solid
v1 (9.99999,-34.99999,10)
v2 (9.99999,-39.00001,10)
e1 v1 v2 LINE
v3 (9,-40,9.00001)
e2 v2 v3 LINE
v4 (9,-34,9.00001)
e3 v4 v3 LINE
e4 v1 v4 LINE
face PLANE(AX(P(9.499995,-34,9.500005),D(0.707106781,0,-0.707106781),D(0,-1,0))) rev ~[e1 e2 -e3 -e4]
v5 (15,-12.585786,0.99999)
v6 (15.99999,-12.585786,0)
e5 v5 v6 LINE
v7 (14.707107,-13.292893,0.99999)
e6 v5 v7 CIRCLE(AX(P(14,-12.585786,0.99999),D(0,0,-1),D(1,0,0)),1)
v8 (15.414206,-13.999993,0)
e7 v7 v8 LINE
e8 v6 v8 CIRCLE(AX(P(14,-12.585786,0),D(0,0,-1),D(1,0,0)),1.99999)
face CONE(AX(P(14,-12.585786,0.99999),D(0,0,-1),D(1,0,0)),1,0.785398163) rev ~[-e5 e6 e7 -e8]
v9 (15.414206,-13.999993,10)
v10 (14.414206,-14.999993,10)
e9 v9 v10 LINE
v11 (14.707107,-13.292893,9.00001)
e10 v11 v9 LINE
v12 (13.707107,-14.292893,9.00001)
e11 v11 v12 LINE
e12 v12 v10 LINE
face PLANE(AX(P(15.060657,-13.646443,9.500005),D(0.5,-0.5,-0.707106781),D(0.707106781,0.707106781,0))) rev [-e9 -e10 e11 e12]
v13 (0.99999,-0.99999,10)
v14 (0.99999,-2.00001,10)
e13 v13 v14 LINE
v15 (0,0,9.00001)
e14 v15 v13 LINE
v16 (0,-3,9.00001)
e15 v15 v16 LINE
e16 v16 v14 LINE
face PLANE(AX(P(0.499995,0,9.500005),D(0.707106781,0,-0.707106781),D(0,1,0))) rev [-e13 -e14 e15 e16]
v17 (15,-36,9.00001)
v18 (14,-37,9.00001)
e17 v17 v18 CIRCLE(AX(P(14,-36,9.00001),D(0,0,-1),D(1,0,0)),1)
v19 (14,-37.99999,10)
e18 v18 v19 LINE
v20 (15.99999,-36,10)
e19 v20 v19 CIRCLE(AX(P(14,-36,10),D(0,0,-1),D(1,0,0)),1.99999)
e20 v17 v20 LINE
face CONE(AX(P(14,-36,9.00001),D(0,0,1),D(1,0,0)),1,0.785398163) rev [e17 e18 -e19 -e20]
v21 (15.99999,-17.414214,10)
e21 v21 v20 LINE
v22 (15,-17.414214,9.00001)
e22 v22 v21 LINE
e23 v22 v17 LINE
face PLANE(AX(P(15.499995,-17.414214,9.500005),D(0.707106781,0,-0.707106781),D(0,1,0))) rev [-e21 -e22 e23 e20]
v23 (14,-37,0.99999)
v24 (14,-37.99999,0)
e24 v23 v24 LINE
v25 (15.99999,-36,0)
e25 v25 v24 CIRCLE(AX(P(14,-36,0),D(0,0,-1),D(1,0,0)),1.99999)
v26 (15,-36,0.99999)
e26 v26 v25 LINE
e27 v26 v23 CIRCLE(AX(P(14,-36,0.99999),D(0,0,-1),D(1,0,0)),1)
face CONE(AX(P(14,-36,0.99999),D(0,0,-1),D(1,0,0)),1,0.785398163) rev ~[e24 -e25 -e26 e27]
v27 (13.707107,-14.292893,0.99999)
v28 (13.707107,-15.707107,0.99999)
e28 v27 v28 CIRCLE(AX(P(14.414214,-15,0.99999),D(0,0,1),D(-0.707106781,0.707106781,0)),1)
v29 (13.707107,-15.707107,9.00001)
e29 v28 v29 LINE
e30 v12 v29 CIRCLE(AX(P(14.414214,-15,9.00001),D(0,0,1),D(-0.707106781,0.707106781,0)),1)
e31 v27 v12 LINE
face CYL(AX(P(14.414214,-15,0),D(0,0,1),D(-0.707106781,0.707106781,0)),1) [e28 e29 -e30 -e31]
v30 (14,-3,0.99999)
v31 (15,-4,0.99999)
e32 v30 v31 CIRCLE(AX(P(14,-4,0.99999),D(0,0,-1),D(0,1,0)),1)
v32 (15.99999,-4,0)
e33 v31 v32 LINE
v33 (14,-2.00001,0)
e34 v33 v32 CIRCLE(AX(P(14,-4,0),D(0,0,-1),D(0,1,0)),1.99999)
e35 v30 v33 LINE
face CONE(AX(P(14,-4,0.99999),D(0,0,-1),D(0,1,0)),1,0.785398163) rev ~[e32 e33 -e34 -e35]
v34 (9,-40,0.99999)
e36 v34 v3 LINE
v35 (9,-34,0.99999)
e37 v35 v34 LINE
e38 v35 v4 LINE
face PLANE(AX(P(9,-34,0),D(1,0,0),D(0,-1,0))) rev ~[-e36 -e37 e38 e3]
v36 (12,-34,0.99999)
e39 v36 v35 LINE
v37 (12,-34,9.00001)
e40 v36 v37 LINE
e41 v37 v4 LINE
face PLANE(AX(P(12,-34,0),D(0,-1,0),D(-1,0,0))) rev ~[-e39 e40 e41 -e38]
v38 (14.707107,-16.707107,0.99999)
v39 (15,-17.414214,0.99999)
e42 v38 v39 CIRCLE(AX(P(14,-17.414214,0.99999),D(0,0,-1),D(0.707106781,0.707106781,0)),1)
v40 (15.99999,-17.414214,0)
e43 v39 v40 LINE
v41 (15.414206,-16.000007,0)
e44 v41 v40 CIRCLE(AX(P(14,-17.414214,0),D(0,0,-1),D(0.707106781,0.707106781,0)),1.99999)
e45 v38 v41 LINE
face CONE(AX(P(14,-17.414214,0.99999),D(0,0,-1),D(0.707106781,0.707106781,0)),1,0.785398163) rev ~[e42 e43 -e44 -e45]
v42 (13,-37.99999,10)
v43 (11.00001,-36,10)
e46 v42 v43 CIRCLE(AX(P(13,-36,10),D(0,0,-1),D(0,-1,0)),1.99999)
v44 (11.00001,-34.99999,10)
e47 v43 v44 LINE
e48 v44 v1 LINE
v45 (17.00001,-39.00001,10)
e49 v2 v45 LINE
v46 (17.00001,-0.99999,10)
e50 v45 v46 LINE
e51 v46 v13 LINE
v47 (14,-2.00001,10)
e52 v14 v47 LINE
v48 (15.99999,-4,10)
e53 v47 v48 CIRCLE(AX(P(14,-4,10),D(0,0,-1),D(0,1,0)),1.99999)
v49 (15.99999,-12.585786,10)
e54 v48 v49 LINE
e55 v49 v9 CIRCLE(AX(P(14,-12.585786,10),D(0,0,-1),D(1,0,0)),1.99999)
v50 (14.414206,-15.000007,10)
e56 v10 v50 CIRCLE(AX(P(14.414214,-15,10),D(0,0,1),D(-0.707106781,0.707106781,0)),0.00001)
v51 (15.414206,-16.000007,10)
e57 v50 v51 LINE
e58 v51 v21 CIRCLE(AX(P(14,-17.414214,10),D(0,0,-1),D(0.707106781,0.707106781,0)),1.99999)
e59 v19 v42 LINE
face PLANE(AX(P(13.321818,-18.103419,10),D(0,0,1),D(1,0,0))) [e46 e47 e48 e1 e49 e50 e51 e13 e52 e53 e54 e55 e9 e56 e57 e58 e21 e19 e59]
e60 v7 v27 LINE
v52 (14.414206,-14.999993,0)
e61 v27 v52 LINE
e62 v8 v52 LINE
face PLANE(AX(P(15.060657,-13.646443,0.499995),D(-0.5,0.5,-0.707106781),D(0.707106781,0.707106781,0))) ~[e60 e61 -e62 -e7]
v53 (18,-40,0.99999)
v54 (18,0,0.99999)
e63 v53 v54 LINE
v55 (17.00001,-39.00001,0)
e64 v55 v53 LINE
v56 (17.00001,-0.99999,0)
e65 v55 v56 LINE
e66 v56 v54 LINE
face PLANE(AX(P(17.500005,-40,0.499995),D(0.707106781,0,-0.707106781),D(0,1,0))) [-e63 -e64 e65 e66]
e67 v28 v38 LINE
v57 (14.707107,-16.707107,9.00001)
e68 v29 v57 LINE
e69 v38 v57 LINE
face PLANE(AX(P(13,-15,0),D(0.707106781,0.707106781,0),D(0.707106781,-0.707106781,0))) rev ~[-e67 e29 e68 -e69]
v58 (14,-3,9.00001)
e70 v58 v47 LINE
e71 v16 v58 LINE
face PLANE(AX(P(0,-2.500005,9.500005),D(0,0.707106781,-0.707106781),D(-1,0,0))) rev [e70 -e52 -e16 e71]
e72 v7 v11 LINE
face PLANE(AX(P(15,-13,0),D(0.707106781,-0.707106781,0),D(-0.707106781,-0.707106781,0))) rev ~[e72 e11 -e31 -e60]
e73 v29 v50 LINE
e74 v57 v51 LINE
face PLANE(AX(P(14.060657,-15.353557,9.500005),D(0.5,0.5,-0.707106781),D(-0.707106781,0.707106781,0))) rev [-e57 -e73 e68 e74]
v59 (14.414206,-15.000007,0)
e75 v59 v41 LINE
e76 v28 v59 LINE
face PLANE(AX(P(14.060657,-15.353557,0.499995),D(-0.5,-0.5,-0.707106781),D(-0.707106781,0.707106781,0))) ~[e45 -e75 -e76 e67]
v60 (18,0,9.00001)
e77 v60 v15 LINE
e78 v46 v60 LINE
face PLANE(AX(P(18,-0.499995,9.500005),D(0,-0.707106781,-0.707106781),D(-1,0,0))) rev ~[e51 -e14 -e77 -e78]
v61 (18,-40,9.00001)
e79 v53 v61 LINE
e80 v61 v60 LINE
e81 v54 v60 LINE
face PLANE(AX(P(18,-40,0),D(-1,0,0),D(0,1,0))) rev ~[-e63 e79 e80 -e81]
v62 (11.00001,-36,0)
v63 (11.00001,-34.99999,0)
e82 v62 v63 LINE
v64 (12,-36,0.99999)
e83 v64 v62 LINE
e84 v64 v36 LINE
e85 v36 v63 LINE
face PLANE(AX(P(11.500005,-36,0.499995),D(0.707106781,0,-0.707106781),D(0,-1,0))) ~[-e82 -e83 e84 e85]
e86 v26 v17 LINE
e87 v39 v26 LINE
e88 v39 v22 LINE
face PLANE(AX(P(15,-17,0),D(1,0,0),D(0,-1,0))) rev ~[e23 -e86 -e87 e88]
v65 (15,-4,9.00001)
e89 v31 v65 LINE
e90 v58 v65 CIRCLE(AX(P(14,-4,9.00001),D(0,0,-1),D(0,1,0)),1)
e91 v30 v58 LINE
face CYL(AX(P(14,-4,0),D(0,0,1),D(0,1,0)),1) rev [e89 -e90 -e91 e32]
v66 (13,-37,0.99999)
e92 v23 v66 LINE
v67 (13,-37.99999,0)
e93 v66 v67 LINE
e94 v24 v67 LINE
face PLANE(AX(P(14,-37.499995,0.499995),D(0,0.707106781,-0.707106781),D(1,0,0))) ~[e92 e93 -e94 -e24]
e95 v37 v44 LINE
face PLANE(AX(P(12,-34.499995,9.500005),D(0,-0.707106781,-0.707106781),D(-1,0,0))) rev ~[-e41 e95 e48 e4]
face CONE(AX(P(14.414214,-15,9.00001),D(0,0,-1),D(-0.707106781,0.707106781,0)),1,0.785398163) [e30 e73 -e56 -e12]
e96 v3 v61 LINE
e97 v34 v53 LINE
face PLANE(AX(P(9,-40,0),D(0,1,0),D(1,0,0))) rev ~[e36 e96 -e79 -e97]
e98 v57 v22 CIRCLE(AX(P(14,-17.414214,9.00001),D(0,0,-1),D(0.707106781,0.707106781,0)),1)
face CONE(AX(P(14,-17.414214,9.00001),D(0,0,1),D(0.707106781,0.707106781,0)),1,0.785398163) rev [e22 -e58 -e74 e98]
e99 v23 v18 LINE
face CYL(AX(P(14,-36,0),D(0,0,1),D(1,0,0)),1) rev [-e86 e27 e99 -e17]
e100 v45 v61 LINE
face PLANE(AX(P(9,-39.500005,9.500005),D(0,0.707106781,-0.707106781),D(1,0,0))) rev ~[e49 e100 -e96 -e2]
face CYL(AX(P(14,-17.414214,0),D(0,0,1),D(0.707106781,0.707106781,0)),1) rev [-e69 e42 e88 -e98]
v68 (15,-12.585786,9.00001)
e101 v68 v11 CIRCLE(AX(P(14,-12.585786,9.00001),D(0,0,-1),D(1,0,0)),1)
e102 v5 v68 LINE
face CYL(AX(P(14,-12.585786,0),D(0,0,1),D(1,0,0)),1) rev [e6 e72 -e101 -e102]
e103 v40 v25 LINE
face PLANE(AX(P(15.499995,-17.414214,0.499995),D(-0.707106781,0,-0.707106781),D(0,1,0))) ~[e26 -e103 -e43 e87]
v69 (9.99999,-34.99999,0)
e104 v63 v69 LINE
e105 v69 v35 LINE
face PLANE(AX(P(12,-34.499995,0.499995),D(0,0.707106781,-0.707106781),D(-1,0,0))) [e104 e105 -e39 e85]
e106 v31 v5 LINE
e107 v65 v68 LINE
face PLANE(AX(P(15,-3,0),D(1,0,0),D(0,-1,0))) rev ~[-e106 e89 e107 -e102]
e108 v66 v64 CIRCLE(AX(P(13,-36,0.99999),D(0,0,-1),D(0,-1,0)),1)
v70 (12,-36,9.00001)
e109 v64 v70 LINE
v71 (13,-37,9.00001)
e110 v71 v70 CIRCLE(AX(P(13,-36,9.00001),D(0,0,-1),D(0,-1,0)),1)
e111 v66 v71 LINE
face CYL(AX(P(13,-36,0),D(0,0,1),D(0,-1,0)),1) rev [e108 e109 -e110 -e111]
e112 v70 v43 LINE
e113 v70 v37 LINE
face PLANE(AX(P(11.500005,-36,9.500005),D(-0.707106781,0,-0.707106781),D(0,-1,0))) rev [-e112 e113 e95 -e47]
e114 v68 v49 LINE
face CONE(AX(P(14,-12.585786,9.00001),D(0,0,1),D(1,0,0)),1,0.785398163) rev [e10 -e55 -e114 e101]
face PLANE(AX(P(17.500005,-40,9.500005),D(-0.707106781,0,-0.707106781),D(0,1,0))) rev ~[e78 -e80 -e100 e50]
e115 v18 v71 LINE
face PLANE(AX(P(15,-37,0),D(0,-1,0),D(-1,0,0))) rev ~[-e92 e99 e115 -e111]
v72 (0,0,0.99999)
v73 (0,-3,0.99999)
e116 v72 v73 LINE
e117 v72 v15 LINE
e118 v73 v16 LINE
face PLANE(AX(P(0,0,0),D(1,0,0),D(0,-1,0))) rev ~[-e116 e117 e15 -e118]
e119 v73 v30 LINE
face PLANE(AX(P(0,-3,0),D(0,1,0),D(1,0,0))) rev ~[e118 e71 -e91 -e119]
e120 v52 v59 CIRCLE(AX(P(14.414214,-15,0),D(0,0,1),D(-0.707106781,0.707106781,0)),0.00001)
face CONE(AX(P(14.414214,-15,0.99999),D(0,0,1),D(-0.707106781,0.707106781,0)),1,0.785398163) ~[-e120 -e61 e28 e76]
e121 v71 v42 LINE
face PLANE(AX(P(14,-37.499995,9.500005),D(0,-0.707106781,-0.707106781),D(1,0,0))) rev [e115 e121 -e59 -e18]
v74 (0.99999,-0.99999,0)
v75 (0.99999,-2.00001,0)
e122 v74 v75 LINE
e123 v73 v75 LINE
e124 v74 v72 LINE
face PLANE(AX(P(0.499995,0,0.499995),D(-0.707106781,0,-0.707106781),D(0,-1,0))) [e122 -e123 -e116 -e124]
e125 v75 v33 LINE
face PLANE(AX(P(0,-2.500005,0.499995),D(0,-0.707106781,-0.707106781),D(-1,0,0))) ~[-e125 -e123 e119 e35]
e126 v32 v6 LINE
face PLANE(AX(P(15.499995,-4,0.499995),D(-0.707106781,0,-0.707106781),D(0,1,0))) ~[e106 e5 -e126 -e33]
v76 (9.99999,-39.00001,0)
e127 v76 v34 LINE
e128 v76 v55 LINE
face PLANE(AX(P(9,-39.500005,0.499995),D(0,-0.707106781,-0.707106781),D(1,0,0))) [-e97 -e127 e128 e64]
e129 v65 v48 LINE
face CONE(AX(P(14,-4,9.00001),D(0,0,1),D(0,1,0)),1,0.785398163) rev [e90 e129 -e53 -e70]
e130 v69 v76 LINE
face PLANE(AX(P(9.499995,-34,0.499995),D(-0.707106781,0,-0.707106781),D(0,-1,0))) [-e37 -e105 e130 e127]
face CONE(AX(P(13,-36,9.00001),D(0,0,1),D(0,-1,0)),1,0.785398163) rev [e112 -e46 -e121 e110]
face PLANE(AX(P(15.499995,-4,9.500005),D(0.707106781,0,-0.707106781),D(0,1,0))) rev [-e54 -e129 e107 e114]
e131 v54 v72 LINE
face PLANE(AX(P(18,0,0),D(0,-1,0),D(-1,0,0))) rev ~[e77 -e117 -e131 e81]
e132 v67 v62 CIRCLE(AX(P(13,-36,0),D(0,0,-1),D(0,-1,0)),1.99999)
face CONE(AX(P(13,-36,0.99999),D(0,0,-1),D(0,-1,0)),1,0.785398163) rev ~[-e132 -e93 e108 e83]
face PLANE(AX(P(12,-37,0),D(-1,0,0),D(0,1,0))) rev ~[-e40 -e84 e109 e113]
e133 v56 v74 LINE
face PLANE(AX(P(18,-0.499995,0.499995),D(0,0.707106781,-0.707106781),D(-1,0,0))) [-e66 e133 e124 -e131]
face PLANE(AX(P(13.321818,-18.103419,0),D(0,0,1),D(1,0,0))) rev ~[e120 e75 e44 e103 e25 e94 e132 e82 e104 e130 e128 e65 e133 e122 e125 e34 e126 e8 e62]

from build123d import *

# Parameters (mm, degrees)
F1_DEPTH = 10
F2_R     = 1
F3_SIZE  = 0.99999


# Not quite as in the source:
# - a fillet or chamfer is up to 0.001 mm smaller than in the source, because OpenCascade refuses the exact size


with BuildPart() as f1:
    # F0 (on Top) → F1 (new body)
    with BuildSketch(Plane.XY):
        Polygon((18, 0), (0, 0), (0, -3), (15, -3), (15, -13), (13, -15), (15, -17), (15, -37), (12, -37), (12, -34), (9, -34), (9, -40), (18, -40), align=None)
    extrude(amount=F1_DEPTH)

    # F2
    f2_edges = [f1.edges().sort_by_distance(p)[0] for p in [
        (13, -15, 5),
        (15, -13, 5),
        (15, -37, 5),
        (15, -17, 5),
        (15, -3, 5),
        (12, -37, 5),
    ]]
    fillet(f2_edges, radius=F2_R)

    # F3 (size 1 in the source; OpenCascade refuses exactly that, so slightly less here)
    f3_edges = [f1.edges().sort_by_distance(p)[0] for p in [
        (7, -3, 10),
        (14.707107, -3.292893, 10),
        (0, -1.5, 10),
        (15, -8.292893, 10),
        (9, 0, 10),
        (14.92388, -12.96847, 10),
        (18, -20, 10),
        (14.207107, -13.792893, 10),
        (13.5, -40, 10),
        (13.414214, -15, 10),
        (9, -37, 10),
        (14.207107, -16.207107, 10),
        (10.5, -34, 10),
        (14.92388, -17.03153, 10),
        (12, -35, 10),
        (15, -26.707107, 10),
        (12.292893, -36.707107, 10),
        (14.707107, -36.707107, 10),
        (13.5, -37, 10),
        (7, -3, 0),
        (14.707107, -3.292893, 0),
        (0, -1.5, 0),
        (15, -8.292893, 0),
        (9, 0, 0),
        (14.92388, -12.96847, 0),
        (18, -20, 0),
        (14.207107, -13.792893, 0),
        (13.5, -40, 0),
        (13.414214, -15, 0),
        (9, -37, 0),
        (14.207107, -16.207107, 0),
        (10.5, -34, 0),
        (14.92388, -17.03153, 0),
        (12, -35, 0),
        (15, -26.707107, 0),
        (12.292893, -36.707107, 0),
        (14.707107, -36.707107, 0),
        (13.5, -37, 0),
    ]]
    chamfer(f3_edges, length=F3_SIZE)


solid = f1.part
